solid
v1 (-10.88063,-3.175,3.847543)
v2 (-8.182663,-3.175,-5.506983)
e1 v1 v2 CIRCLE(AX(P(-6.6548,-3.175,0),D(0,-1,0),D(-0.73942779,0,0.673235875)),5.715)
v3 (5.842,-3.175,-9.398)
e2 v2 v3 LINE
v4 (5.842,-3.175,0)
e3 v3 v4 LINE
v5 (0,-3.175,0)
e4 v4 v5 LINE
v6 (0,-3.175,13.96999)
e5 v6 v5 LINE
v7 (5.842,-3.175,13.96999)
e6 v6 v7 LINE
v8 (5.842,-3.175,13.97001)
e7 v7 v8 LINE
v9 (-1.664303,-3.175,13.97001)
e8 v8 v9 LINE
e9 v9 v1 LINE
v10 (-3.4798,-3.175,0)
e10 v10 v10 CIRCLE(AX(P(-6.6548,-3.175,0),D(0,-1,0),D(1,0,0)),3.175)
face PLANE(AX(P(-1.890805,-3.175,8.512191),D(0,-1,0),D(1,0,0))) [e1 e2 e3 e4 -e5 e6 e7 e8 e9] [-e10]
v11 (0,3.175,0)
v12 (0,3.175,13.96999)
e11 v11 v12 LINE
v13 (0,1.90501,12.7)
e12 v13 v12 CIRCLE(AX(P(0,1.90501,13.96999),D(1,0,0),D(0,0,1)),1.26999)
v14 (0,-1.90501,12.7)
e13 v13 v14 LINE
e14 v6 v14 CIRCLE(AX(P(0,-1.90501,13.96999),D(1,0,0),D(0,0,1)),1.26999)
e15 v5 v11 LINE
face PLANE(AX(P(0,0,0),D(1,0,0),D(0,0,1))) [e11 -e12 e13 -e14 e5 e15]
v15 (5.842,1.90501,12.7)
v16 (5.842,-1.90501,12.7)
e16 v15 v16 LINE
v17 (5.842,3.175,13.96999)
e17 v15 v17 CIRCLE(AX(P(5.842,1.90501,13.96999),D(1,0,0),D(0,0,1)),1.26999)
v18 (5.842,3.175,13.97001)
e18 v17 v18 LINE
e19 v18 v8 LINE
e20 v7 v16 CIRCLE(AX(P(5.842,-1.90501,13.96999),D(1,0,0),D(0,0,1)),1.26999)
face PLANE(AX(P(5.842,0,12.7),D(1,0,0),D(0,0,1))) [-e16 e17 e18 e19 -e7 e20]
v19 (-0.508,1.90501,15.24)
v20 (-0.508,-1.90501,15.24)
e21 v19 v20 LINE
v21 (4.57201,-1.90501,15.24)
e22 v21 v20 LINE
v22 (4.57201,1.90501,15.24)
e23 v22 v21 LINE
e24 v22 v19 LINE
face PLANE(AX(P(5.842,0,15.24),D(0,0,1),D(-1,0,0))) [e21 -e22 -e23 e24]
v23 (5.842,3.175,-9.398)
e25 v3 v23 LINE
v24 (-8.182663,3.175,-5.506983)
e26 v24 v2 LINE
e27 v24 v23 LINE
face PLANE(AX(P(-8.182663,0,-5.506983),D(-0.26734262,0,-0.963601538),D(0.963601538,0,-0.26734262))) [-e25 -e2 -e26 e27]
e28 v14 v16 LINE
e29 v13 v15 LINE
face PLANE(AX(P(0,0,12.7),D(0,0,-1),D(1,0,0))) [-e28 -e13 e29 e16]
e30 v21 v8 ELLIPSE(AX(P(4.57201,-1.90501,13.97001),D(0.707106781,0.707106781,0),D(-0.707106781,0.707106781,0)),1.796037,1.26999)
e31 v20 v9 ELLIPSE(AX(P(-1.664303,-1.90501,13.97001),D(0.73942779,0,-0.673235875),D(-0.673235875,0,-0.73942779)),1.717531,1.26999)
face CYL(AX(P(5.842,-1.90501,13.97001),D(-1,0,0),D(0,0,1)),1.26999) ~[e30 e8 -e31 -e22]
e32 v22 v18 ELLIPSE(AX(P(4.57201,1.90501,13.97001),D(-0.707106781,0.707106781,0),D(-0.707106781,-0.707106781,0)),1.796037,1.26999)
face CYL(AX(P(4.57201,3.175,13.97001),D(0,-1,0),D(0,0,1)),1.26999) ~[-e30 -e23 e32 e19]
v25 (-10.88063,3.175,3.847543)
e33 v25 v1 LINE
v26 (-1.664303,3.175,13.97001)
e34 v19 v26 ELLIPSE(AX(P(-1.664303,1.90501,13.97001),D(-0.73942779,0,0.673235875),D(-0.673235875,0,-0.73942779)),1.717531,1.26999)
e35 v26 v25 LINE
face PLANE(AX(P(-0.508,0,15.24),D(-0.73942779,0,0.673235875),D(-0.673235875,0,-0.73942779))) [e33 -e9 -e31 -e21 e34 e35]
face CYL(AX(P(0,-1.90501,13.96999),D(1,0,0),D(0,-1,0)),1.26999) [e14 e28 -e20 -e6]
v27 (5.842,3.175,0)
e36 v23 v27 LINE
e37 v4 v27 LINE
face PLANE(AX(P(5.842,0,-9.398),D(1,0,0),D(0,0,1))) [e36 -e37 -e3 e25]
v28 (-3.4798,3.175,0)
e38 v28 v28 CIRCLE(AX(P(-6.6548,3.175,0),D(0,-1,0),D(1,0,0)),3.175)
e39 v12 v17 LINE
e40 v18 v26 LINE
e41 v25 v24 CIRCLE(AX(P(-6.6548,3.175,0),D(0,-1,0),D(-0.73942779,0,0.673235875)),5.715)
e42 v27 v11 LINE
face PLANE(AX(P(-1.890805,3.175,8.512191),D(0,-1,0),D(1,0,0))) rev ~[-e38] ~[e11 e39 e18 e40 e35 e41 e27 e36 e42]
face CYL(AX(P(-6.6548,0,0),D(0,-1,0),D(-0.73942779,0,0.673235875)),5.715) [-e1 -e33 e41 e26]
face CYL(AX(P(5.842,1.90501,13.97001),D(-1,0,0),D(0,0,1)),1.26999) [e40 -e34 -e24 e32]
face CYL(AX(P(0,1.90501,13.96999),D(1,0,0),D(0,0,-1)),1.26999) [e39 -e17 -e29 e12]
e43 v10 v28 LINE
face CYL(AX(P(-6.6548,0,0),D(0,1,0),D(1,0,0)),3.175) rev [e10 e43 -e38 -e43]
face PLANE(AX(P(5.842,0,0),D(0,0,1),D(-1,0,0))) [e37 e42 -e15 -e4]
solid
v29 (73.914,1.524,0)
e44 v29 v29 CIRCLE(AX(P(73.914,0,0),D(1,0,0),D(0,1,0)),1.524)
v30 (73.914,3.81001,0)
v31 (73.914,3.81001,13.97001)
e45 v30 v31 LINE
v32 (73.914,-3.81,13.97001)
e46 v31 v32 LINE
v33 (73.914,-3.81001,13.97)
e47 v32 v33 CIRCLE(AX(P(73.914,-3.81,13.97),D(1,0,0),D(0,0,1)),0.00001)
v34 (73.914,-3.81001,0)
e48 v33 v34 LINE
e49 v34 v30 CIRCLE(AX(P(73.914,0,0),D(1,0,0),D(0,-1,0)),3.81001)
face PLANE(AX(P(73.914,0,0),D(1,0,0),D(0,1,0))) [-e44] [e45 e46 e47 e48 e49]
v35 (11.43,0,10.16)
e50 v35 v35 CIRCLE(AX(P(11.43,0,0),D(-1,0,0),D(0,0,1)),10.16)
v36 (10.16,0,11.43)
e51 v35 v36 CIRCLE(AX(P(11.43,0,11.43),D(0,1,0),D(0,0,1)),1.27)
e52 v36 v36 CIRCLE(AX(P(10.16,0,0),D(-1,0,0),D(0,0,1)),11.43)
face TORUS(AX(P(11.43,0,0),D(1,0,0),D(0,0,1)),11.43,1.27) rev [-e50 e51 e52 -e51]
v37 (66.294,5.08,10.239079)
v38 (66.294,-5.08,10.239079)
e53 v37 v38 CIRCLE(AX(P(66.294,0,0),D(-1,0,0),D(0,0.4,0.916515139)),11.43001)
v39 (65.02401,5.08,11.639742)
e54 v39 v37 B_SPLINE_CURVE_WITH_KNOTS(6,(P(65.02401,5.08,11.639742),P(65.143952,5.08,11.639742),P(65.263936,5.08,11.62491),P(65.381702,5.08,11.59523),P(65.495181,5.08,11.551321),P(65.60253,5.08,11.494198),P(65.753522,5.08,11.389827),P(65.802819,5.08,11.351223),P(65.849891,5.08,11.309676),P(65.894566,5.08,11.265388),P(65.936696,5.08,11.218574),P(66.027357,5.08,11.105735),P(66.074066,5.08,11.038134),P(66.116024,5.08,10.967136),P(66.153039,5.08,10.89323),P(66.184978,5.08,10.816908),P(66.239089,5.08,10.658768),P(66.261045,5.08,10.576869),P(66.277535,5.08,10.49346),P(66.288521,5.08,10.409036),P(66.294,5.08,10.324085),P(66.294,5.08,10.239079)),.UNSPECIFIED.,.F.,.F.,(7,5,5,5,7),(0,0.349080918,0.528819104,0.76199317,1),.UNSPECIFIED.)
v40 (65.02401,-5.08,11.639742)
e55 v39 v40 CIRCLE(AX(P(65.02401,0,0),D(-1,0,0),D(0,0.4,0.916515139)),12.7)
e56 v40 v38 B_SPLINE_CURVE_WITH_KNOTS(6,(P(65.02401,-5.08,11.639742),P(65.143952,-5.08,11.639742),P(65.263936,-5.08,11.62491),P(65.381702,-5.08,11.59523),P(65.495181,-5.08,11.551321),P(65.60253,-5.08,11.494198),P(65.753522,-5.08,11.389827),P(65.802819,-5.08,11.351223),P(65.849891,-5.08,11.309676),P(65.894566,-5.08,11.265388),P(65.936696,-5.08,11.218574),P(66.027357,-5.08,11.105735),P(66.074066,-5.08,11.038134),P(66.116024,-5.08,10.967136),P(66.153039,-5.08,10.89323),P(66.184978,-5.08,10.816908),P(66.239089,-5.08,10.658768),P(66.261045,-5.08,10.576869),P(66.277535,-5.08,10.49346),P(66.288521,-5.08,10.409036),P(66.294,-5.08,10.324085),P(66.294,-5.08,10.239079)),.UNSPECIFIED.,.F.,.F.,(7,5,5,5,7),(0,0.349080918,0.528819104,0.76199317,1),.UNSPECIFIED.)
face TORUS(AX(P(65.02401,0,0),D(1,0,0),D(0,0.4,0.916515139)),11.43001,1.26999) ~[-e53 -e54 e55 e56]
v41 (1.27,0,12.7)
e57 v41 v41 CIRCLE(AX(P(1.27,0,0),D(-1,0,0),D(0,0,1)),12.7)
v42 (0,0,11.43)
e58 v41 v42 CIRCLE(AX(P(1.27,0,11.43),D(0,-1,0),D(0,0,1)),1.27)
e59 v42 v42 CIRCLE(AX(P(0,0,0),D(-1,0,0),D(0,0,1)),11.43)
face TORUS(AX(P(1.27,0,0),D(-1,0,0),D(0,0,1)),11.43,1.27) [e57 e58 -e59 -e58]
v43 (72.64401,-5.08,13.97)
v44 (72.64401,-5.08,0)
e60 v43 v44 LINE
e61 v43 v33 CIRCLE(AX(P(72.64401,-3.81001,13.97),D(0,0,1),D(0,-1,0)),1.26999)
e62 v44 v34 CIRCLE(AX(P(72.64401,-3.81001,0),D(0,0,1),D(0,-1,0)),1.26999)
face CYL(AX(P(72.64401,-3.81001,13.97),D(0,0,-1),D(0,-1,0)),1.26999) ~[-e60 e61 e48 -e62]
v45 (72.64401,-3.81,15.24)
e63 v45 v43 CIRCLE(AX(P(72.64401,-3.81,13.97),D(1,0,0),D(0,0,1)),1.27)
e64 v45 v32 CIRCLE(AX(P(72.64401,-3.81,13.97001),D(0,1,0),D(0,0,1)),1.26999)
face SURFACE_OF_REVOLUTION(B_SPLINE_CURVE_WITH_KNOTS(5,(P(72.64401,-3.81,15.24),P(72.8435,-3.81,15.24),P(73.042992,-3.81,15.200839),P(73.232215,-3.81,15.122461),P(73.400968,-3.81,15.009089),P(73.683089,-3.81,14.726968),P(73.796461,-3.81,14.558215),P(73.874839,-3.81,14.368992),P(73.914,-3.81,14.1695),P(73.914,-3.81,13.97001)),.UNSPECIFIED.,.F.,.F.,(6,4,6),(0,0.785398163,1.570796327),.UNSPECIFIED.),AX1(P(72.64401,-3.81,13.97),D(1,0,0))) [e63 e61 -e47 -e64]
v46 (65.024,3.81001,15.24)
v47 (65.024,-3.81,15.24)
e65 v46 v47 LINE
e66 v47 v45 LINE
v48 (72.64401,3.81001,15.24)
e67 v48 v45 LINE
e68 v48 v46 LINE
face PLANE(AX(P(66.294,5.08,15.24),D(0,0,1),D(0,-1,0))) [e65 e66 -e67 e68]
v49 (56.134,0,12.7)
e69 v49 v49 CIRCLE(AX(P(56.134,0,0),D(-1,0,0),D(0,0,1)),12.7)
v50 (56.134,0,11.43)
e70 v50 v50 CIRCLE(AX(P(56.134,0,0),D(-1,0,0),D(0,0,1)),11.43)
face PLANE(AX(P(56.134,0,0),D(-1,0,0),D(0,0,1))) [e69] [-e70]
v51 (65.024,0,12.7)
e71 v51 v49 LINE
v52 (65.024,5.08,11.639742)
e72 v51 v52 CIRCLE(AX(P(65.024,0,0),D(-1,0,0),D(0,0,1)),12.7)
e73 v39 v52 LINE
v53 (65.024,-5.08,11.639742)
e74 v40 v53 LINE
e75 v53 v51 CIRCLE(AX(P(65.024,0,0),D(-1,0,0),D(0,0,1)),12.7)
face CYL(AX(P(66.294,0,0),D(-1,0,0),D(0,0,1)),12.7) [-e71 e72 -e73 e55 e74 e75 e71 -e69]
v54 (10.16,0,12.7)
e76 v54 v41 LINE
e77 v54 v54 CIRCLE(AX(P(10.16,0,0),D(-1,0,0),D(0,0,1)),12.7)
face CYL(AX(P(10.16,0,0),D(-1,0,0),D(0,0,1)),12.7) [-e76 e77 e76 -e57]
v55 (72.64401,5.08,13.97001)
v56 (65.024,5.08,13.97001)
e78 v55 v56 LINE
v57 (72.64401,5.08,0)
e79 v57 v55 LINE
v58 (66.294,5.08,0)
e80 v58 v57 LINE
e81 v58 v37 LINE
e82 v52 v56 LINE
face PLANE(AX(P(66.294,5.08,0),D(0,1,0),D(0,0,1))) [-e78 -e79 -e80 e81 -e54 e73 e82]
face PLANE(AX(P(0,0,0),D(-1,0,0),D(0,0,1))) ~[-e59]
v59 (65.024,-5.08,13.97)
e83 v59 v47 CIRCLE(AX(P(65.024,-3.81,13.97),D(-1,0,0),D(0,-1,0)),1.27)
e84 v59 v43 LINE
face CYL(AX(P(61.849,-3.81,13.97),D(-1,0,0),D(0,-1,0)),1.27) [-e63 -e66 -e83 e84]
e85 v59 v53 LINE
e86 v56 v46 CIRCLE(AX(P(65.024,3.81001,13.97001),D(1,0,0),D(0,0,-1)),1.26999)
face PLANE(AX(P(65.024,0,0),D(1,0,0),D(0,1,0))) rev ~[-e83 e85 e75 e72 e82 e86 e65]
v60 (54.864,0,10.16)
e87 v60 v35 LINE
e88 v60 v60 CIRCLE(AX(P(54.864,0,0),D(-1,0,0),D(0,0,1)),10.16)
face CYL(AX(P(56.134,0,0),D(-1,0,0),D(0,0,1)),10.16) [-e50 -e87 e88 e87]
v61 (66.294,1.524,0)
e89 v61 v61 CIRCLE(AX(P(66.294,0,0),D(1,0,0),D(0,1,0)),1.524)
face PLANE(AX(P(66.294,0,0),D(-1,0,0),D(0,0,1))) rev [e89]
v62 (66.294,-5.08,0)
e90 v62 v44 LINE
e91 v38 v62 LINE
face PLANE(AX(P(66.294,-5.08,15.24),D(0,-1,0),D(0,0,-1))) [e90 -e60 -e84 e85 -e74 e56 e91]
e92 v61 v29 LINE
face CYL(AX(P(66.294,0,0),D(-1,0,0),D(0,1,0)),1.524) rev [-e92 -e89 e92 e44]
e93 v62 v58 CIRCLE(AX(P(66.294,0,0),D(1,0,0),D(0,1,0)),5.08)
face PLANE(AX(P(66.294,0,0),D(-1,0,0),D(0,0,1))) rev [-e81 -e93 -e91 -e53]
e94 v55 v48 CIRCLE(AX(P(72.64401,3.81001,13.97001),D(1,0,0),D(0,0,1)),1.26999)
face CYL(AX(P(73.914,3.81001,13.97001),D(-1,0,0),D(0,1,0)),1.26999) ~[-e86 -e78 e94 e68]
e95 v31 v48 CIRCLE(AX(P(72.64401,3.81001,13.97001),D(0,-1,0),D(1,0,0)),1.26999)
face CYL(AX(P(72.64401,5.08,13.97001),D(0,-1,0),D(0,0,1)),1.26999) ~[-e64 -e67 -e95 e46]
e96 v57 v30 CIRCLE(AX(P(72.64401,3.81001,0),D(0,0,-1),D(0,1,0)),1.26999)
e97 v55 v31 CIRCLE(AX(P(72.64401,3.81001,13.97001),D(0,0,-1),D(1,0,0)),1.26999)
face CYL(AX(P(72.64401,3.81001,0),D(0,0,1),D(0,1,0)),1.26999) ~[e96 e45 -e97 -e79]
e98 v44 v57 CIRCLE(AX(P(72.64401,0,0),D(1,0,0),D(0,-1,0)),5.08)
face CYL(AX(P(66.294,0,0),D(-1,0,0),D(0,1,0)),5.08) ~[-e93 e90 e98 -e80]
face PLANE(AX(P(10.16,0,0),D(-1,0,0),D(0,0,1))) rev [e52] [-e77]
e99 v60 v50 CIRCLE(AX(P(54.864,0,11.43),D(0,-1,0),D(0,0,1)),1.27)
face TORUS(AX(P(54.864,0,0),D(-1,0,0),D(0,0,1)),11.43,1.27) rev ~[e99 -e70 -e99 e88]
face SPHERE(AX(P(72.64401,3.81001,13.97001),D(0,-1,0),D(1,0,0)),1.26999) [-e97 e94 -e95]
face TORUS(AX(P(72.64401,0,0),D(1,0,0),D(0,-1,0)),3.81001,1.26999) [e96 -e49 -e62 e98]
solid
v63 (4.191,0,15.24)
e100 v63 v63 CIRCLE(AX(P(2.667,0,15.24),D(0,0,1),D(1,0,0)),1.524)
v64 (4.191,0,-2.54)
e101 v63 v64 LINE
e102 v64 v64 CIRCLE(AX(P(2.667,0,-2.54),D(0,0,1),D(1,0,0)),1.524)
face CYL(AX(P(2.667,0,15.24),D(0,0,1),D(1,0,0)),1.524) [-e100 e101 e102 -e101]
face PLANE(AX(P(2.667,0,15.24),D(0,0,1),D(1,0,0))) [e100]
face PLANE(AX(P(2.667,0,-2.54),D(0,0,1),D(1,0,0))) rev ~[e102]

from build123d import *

# Parameters (mm, degrees)
F0_W          = 5.842
F0_H          = 12.7
F0_R          = 3.175
F2_DEPTH      = 3.175
F3_R          = 1.524
F4_DEPTH      = 7.62
F4_DEPTH_BACK = 1.27
F7_R          = 1.524
F8_DEPTH      = 17.78
F9_R          = 1.27
F10_R         = 1.27
F11_T1_DEPTH  = 15.24
F12_R         = 1.26999
F12_2_R       = 1.26999
F13_R         = 1.27


# Not quite as in the source:
# - a fillet or chamfer that OpenCascade refuses, or shapes differently, is made with other operations: its cross-section is extruded or revolved along the edge and cut away or added
# - a fillet or chamfer is up to 0.001 mm smaller than in the source, because OpenCascade refuses the exact size
# - the program builds the solid bodies; features that only make, move or delete a surface that nothing else refers to are left out


with BuildPart() as f1:
    # F0 (on Front) → F1 (revolve)
    with BuildSketch(Plane.XZ):
        Polygon((5.842, 12.7), (5.842, 0), (66.294, 0), (66.294, 12.7), (56.134, 12.7), (56.134, 10.16), (10.16, 10.16), (10.16, 12.7), align=None)
        with Locations((2.921, 6.35)):
            Rectangle(F0_W, F0_H)
    revolve(axis=Axis((33.147, 0, 0), (-1, 0, 0)))

    # F3 (on face) → F4 (join, two sides)
    with BuildSketch(Plane.YZ.offset(66.294)) as f4_sk:
        with BuildLine():
            ThreePointArc((-5.08, 0), (0, -5.08), (5.08, 0))
            ThreePointArc((5.08, 0), (0, 5.08), (-5.08, 0))
        make_face()
        Circle(F3_R, mode=Mode.SUBTRACT)
        with BuildLine():
            ThreePointArc((-5.08, 0), (0, 5.08), (5.08, 0))
            Line((5.08, 0), (5.08, 15.24))
            Line((5.08, 15.24), (-5.08, 15.24))
            Line((-5.08, 15.24), (-5.08, 0))
        make_face()
    extrude(amount=F4_DEPTH)
    extrude(f4_sk.sketch, amount=-F4_DEPTH_BACK)

    # F9
    f9_edges = [f1.edges().sort_by_distance(p)[0] for p in [
        (10.16, 0, -10.16),
    ]]
    fillet(f9_edges, radius=F9_R)

    # F10
    f10_edges = [f1.edges().sort_by_distance(p)[0] for p in [
        (56.134, 0, -10.16),
    ]]
    fillet(f10_edges, radius=F10_R)

    # F11: fillet of radius 1.27 on 1 edges, made by hand

    # F11_s2 → F11_t1 (cut)
    with BuildSketch(Plane.YZ.offset(61.849)):
        with BuildLine():
            ThreePointArc((-5.08, 13.97), (-4.7080256121, 14.8680256121), (-3.81, 15.24))
            Line((-3.81, 15.24), (-5.08, 15.24))
            Line((-5.08, 15.24), (-5.08, 13.97))
        make_face()
    extrude(amount=F11_T1_DEPTH, mode=Mode.SUBTRACT)

    # F12 (radius 1.27 in the source; OpenCascade refuses exactly that, so slightly less here)
    f12_edges = [f1.edges().sort_by_distance(p)[0] for p in [
        (73.914, 0.635, 15.24),
        (69.469, 5.08, 15.24),
        (66.294, 0, -12.7),
    ]]
    fillet(f12_edges, radius=F12_R)

    # F13
    f13_edges = [f1.edges().sort_by_distance(p)[0] for p in [
        (0, 0, -12.7),
    ]]
    fillet(f13_edges, radius=F13_R)


with BuildPart() as f2:
    # F0 (on Front) → F2 (new body, symmetric)
    with BuildSketch(Plane.XZ):
        with BuildLine():
            Line((-0.9398, 0), (0, 0))
            Line((0, 0), (0, 12.7))
            Line((0, 12.7), (5.842, 12.7))
            Line((5.842, 12.7), (5.842, 15.24))
            Line((5.842, 15.24), (-0.508, 15.24))
            Line((-0.508, 15.24), (-10.8806298187, 3.8475430269))
            ThreePointArc((-10.8806298187, 3.8475430269), (-4.5919612295, 5.3297205562), (-0.9398, 0))
        make_face()
        with BuildLine():
            ThreePointArc((-8.1826630726, -5.5069827884), (-3.1957909266, -4.5493385486), (-0.9398, 0))
            ThreePointArc((-0.9398, 0), (-4.5919612295, 5.3297205562), (-10.8806298187, 3.8475430269))
            ThreePointArc((-10.8806298187, 3.8475430269), (-12.1459778134, -1.5837270034), (-8.1826630726, -5.5069827884))
        make_face()
        with Locations((-6.6548, 0)):
            Circle(F0_R, mode=Mode.SUBTRACT)
        with BuildLine():
            Line((5.842, 0), (0, 0))
            Line((0, 0), (-0.9398, 0))
            ThreePointArc((-0.9398, 0), (-3.1957909266, -4.5493385486), (-8.1826630726, -5.5069827884))
            Line((-8.1826630726, -5.5069827884), (5.842, -9.398))
            Line((5.842, -9.398), (5.842, 0))
        make_face()
    extrude(amount=F2_DEPTH, both=True)

    # F12#2 (radius 1.27 in the source; OpenCascade refuses exactly that, so slightly less here)
    f12_2_edges = [f2.edges().sort_by_distance(p)[0] for p in [
        (2.667, -3.175, 15.24),
        (2.921, -3.175, 12.7),
        (2.667, 3.175, 15.24),
        (2.921, 3.175, 12.7),
        (5.842, 0, 15.24),
    ]]
    fillet(f12_2_edges, radius=F12_2_R)


with BuildPart() as f8:
    # F7 (on face) → F8 (new body)
    with BuildSketch(Plane.XY.offset(15.24)):
        with Locations((2.667, 0)):
            Circle(F7_R)
    extrude(amount=-F8_DEPTH)


solid = Compound([f1.part, f2.part, f8.part])
